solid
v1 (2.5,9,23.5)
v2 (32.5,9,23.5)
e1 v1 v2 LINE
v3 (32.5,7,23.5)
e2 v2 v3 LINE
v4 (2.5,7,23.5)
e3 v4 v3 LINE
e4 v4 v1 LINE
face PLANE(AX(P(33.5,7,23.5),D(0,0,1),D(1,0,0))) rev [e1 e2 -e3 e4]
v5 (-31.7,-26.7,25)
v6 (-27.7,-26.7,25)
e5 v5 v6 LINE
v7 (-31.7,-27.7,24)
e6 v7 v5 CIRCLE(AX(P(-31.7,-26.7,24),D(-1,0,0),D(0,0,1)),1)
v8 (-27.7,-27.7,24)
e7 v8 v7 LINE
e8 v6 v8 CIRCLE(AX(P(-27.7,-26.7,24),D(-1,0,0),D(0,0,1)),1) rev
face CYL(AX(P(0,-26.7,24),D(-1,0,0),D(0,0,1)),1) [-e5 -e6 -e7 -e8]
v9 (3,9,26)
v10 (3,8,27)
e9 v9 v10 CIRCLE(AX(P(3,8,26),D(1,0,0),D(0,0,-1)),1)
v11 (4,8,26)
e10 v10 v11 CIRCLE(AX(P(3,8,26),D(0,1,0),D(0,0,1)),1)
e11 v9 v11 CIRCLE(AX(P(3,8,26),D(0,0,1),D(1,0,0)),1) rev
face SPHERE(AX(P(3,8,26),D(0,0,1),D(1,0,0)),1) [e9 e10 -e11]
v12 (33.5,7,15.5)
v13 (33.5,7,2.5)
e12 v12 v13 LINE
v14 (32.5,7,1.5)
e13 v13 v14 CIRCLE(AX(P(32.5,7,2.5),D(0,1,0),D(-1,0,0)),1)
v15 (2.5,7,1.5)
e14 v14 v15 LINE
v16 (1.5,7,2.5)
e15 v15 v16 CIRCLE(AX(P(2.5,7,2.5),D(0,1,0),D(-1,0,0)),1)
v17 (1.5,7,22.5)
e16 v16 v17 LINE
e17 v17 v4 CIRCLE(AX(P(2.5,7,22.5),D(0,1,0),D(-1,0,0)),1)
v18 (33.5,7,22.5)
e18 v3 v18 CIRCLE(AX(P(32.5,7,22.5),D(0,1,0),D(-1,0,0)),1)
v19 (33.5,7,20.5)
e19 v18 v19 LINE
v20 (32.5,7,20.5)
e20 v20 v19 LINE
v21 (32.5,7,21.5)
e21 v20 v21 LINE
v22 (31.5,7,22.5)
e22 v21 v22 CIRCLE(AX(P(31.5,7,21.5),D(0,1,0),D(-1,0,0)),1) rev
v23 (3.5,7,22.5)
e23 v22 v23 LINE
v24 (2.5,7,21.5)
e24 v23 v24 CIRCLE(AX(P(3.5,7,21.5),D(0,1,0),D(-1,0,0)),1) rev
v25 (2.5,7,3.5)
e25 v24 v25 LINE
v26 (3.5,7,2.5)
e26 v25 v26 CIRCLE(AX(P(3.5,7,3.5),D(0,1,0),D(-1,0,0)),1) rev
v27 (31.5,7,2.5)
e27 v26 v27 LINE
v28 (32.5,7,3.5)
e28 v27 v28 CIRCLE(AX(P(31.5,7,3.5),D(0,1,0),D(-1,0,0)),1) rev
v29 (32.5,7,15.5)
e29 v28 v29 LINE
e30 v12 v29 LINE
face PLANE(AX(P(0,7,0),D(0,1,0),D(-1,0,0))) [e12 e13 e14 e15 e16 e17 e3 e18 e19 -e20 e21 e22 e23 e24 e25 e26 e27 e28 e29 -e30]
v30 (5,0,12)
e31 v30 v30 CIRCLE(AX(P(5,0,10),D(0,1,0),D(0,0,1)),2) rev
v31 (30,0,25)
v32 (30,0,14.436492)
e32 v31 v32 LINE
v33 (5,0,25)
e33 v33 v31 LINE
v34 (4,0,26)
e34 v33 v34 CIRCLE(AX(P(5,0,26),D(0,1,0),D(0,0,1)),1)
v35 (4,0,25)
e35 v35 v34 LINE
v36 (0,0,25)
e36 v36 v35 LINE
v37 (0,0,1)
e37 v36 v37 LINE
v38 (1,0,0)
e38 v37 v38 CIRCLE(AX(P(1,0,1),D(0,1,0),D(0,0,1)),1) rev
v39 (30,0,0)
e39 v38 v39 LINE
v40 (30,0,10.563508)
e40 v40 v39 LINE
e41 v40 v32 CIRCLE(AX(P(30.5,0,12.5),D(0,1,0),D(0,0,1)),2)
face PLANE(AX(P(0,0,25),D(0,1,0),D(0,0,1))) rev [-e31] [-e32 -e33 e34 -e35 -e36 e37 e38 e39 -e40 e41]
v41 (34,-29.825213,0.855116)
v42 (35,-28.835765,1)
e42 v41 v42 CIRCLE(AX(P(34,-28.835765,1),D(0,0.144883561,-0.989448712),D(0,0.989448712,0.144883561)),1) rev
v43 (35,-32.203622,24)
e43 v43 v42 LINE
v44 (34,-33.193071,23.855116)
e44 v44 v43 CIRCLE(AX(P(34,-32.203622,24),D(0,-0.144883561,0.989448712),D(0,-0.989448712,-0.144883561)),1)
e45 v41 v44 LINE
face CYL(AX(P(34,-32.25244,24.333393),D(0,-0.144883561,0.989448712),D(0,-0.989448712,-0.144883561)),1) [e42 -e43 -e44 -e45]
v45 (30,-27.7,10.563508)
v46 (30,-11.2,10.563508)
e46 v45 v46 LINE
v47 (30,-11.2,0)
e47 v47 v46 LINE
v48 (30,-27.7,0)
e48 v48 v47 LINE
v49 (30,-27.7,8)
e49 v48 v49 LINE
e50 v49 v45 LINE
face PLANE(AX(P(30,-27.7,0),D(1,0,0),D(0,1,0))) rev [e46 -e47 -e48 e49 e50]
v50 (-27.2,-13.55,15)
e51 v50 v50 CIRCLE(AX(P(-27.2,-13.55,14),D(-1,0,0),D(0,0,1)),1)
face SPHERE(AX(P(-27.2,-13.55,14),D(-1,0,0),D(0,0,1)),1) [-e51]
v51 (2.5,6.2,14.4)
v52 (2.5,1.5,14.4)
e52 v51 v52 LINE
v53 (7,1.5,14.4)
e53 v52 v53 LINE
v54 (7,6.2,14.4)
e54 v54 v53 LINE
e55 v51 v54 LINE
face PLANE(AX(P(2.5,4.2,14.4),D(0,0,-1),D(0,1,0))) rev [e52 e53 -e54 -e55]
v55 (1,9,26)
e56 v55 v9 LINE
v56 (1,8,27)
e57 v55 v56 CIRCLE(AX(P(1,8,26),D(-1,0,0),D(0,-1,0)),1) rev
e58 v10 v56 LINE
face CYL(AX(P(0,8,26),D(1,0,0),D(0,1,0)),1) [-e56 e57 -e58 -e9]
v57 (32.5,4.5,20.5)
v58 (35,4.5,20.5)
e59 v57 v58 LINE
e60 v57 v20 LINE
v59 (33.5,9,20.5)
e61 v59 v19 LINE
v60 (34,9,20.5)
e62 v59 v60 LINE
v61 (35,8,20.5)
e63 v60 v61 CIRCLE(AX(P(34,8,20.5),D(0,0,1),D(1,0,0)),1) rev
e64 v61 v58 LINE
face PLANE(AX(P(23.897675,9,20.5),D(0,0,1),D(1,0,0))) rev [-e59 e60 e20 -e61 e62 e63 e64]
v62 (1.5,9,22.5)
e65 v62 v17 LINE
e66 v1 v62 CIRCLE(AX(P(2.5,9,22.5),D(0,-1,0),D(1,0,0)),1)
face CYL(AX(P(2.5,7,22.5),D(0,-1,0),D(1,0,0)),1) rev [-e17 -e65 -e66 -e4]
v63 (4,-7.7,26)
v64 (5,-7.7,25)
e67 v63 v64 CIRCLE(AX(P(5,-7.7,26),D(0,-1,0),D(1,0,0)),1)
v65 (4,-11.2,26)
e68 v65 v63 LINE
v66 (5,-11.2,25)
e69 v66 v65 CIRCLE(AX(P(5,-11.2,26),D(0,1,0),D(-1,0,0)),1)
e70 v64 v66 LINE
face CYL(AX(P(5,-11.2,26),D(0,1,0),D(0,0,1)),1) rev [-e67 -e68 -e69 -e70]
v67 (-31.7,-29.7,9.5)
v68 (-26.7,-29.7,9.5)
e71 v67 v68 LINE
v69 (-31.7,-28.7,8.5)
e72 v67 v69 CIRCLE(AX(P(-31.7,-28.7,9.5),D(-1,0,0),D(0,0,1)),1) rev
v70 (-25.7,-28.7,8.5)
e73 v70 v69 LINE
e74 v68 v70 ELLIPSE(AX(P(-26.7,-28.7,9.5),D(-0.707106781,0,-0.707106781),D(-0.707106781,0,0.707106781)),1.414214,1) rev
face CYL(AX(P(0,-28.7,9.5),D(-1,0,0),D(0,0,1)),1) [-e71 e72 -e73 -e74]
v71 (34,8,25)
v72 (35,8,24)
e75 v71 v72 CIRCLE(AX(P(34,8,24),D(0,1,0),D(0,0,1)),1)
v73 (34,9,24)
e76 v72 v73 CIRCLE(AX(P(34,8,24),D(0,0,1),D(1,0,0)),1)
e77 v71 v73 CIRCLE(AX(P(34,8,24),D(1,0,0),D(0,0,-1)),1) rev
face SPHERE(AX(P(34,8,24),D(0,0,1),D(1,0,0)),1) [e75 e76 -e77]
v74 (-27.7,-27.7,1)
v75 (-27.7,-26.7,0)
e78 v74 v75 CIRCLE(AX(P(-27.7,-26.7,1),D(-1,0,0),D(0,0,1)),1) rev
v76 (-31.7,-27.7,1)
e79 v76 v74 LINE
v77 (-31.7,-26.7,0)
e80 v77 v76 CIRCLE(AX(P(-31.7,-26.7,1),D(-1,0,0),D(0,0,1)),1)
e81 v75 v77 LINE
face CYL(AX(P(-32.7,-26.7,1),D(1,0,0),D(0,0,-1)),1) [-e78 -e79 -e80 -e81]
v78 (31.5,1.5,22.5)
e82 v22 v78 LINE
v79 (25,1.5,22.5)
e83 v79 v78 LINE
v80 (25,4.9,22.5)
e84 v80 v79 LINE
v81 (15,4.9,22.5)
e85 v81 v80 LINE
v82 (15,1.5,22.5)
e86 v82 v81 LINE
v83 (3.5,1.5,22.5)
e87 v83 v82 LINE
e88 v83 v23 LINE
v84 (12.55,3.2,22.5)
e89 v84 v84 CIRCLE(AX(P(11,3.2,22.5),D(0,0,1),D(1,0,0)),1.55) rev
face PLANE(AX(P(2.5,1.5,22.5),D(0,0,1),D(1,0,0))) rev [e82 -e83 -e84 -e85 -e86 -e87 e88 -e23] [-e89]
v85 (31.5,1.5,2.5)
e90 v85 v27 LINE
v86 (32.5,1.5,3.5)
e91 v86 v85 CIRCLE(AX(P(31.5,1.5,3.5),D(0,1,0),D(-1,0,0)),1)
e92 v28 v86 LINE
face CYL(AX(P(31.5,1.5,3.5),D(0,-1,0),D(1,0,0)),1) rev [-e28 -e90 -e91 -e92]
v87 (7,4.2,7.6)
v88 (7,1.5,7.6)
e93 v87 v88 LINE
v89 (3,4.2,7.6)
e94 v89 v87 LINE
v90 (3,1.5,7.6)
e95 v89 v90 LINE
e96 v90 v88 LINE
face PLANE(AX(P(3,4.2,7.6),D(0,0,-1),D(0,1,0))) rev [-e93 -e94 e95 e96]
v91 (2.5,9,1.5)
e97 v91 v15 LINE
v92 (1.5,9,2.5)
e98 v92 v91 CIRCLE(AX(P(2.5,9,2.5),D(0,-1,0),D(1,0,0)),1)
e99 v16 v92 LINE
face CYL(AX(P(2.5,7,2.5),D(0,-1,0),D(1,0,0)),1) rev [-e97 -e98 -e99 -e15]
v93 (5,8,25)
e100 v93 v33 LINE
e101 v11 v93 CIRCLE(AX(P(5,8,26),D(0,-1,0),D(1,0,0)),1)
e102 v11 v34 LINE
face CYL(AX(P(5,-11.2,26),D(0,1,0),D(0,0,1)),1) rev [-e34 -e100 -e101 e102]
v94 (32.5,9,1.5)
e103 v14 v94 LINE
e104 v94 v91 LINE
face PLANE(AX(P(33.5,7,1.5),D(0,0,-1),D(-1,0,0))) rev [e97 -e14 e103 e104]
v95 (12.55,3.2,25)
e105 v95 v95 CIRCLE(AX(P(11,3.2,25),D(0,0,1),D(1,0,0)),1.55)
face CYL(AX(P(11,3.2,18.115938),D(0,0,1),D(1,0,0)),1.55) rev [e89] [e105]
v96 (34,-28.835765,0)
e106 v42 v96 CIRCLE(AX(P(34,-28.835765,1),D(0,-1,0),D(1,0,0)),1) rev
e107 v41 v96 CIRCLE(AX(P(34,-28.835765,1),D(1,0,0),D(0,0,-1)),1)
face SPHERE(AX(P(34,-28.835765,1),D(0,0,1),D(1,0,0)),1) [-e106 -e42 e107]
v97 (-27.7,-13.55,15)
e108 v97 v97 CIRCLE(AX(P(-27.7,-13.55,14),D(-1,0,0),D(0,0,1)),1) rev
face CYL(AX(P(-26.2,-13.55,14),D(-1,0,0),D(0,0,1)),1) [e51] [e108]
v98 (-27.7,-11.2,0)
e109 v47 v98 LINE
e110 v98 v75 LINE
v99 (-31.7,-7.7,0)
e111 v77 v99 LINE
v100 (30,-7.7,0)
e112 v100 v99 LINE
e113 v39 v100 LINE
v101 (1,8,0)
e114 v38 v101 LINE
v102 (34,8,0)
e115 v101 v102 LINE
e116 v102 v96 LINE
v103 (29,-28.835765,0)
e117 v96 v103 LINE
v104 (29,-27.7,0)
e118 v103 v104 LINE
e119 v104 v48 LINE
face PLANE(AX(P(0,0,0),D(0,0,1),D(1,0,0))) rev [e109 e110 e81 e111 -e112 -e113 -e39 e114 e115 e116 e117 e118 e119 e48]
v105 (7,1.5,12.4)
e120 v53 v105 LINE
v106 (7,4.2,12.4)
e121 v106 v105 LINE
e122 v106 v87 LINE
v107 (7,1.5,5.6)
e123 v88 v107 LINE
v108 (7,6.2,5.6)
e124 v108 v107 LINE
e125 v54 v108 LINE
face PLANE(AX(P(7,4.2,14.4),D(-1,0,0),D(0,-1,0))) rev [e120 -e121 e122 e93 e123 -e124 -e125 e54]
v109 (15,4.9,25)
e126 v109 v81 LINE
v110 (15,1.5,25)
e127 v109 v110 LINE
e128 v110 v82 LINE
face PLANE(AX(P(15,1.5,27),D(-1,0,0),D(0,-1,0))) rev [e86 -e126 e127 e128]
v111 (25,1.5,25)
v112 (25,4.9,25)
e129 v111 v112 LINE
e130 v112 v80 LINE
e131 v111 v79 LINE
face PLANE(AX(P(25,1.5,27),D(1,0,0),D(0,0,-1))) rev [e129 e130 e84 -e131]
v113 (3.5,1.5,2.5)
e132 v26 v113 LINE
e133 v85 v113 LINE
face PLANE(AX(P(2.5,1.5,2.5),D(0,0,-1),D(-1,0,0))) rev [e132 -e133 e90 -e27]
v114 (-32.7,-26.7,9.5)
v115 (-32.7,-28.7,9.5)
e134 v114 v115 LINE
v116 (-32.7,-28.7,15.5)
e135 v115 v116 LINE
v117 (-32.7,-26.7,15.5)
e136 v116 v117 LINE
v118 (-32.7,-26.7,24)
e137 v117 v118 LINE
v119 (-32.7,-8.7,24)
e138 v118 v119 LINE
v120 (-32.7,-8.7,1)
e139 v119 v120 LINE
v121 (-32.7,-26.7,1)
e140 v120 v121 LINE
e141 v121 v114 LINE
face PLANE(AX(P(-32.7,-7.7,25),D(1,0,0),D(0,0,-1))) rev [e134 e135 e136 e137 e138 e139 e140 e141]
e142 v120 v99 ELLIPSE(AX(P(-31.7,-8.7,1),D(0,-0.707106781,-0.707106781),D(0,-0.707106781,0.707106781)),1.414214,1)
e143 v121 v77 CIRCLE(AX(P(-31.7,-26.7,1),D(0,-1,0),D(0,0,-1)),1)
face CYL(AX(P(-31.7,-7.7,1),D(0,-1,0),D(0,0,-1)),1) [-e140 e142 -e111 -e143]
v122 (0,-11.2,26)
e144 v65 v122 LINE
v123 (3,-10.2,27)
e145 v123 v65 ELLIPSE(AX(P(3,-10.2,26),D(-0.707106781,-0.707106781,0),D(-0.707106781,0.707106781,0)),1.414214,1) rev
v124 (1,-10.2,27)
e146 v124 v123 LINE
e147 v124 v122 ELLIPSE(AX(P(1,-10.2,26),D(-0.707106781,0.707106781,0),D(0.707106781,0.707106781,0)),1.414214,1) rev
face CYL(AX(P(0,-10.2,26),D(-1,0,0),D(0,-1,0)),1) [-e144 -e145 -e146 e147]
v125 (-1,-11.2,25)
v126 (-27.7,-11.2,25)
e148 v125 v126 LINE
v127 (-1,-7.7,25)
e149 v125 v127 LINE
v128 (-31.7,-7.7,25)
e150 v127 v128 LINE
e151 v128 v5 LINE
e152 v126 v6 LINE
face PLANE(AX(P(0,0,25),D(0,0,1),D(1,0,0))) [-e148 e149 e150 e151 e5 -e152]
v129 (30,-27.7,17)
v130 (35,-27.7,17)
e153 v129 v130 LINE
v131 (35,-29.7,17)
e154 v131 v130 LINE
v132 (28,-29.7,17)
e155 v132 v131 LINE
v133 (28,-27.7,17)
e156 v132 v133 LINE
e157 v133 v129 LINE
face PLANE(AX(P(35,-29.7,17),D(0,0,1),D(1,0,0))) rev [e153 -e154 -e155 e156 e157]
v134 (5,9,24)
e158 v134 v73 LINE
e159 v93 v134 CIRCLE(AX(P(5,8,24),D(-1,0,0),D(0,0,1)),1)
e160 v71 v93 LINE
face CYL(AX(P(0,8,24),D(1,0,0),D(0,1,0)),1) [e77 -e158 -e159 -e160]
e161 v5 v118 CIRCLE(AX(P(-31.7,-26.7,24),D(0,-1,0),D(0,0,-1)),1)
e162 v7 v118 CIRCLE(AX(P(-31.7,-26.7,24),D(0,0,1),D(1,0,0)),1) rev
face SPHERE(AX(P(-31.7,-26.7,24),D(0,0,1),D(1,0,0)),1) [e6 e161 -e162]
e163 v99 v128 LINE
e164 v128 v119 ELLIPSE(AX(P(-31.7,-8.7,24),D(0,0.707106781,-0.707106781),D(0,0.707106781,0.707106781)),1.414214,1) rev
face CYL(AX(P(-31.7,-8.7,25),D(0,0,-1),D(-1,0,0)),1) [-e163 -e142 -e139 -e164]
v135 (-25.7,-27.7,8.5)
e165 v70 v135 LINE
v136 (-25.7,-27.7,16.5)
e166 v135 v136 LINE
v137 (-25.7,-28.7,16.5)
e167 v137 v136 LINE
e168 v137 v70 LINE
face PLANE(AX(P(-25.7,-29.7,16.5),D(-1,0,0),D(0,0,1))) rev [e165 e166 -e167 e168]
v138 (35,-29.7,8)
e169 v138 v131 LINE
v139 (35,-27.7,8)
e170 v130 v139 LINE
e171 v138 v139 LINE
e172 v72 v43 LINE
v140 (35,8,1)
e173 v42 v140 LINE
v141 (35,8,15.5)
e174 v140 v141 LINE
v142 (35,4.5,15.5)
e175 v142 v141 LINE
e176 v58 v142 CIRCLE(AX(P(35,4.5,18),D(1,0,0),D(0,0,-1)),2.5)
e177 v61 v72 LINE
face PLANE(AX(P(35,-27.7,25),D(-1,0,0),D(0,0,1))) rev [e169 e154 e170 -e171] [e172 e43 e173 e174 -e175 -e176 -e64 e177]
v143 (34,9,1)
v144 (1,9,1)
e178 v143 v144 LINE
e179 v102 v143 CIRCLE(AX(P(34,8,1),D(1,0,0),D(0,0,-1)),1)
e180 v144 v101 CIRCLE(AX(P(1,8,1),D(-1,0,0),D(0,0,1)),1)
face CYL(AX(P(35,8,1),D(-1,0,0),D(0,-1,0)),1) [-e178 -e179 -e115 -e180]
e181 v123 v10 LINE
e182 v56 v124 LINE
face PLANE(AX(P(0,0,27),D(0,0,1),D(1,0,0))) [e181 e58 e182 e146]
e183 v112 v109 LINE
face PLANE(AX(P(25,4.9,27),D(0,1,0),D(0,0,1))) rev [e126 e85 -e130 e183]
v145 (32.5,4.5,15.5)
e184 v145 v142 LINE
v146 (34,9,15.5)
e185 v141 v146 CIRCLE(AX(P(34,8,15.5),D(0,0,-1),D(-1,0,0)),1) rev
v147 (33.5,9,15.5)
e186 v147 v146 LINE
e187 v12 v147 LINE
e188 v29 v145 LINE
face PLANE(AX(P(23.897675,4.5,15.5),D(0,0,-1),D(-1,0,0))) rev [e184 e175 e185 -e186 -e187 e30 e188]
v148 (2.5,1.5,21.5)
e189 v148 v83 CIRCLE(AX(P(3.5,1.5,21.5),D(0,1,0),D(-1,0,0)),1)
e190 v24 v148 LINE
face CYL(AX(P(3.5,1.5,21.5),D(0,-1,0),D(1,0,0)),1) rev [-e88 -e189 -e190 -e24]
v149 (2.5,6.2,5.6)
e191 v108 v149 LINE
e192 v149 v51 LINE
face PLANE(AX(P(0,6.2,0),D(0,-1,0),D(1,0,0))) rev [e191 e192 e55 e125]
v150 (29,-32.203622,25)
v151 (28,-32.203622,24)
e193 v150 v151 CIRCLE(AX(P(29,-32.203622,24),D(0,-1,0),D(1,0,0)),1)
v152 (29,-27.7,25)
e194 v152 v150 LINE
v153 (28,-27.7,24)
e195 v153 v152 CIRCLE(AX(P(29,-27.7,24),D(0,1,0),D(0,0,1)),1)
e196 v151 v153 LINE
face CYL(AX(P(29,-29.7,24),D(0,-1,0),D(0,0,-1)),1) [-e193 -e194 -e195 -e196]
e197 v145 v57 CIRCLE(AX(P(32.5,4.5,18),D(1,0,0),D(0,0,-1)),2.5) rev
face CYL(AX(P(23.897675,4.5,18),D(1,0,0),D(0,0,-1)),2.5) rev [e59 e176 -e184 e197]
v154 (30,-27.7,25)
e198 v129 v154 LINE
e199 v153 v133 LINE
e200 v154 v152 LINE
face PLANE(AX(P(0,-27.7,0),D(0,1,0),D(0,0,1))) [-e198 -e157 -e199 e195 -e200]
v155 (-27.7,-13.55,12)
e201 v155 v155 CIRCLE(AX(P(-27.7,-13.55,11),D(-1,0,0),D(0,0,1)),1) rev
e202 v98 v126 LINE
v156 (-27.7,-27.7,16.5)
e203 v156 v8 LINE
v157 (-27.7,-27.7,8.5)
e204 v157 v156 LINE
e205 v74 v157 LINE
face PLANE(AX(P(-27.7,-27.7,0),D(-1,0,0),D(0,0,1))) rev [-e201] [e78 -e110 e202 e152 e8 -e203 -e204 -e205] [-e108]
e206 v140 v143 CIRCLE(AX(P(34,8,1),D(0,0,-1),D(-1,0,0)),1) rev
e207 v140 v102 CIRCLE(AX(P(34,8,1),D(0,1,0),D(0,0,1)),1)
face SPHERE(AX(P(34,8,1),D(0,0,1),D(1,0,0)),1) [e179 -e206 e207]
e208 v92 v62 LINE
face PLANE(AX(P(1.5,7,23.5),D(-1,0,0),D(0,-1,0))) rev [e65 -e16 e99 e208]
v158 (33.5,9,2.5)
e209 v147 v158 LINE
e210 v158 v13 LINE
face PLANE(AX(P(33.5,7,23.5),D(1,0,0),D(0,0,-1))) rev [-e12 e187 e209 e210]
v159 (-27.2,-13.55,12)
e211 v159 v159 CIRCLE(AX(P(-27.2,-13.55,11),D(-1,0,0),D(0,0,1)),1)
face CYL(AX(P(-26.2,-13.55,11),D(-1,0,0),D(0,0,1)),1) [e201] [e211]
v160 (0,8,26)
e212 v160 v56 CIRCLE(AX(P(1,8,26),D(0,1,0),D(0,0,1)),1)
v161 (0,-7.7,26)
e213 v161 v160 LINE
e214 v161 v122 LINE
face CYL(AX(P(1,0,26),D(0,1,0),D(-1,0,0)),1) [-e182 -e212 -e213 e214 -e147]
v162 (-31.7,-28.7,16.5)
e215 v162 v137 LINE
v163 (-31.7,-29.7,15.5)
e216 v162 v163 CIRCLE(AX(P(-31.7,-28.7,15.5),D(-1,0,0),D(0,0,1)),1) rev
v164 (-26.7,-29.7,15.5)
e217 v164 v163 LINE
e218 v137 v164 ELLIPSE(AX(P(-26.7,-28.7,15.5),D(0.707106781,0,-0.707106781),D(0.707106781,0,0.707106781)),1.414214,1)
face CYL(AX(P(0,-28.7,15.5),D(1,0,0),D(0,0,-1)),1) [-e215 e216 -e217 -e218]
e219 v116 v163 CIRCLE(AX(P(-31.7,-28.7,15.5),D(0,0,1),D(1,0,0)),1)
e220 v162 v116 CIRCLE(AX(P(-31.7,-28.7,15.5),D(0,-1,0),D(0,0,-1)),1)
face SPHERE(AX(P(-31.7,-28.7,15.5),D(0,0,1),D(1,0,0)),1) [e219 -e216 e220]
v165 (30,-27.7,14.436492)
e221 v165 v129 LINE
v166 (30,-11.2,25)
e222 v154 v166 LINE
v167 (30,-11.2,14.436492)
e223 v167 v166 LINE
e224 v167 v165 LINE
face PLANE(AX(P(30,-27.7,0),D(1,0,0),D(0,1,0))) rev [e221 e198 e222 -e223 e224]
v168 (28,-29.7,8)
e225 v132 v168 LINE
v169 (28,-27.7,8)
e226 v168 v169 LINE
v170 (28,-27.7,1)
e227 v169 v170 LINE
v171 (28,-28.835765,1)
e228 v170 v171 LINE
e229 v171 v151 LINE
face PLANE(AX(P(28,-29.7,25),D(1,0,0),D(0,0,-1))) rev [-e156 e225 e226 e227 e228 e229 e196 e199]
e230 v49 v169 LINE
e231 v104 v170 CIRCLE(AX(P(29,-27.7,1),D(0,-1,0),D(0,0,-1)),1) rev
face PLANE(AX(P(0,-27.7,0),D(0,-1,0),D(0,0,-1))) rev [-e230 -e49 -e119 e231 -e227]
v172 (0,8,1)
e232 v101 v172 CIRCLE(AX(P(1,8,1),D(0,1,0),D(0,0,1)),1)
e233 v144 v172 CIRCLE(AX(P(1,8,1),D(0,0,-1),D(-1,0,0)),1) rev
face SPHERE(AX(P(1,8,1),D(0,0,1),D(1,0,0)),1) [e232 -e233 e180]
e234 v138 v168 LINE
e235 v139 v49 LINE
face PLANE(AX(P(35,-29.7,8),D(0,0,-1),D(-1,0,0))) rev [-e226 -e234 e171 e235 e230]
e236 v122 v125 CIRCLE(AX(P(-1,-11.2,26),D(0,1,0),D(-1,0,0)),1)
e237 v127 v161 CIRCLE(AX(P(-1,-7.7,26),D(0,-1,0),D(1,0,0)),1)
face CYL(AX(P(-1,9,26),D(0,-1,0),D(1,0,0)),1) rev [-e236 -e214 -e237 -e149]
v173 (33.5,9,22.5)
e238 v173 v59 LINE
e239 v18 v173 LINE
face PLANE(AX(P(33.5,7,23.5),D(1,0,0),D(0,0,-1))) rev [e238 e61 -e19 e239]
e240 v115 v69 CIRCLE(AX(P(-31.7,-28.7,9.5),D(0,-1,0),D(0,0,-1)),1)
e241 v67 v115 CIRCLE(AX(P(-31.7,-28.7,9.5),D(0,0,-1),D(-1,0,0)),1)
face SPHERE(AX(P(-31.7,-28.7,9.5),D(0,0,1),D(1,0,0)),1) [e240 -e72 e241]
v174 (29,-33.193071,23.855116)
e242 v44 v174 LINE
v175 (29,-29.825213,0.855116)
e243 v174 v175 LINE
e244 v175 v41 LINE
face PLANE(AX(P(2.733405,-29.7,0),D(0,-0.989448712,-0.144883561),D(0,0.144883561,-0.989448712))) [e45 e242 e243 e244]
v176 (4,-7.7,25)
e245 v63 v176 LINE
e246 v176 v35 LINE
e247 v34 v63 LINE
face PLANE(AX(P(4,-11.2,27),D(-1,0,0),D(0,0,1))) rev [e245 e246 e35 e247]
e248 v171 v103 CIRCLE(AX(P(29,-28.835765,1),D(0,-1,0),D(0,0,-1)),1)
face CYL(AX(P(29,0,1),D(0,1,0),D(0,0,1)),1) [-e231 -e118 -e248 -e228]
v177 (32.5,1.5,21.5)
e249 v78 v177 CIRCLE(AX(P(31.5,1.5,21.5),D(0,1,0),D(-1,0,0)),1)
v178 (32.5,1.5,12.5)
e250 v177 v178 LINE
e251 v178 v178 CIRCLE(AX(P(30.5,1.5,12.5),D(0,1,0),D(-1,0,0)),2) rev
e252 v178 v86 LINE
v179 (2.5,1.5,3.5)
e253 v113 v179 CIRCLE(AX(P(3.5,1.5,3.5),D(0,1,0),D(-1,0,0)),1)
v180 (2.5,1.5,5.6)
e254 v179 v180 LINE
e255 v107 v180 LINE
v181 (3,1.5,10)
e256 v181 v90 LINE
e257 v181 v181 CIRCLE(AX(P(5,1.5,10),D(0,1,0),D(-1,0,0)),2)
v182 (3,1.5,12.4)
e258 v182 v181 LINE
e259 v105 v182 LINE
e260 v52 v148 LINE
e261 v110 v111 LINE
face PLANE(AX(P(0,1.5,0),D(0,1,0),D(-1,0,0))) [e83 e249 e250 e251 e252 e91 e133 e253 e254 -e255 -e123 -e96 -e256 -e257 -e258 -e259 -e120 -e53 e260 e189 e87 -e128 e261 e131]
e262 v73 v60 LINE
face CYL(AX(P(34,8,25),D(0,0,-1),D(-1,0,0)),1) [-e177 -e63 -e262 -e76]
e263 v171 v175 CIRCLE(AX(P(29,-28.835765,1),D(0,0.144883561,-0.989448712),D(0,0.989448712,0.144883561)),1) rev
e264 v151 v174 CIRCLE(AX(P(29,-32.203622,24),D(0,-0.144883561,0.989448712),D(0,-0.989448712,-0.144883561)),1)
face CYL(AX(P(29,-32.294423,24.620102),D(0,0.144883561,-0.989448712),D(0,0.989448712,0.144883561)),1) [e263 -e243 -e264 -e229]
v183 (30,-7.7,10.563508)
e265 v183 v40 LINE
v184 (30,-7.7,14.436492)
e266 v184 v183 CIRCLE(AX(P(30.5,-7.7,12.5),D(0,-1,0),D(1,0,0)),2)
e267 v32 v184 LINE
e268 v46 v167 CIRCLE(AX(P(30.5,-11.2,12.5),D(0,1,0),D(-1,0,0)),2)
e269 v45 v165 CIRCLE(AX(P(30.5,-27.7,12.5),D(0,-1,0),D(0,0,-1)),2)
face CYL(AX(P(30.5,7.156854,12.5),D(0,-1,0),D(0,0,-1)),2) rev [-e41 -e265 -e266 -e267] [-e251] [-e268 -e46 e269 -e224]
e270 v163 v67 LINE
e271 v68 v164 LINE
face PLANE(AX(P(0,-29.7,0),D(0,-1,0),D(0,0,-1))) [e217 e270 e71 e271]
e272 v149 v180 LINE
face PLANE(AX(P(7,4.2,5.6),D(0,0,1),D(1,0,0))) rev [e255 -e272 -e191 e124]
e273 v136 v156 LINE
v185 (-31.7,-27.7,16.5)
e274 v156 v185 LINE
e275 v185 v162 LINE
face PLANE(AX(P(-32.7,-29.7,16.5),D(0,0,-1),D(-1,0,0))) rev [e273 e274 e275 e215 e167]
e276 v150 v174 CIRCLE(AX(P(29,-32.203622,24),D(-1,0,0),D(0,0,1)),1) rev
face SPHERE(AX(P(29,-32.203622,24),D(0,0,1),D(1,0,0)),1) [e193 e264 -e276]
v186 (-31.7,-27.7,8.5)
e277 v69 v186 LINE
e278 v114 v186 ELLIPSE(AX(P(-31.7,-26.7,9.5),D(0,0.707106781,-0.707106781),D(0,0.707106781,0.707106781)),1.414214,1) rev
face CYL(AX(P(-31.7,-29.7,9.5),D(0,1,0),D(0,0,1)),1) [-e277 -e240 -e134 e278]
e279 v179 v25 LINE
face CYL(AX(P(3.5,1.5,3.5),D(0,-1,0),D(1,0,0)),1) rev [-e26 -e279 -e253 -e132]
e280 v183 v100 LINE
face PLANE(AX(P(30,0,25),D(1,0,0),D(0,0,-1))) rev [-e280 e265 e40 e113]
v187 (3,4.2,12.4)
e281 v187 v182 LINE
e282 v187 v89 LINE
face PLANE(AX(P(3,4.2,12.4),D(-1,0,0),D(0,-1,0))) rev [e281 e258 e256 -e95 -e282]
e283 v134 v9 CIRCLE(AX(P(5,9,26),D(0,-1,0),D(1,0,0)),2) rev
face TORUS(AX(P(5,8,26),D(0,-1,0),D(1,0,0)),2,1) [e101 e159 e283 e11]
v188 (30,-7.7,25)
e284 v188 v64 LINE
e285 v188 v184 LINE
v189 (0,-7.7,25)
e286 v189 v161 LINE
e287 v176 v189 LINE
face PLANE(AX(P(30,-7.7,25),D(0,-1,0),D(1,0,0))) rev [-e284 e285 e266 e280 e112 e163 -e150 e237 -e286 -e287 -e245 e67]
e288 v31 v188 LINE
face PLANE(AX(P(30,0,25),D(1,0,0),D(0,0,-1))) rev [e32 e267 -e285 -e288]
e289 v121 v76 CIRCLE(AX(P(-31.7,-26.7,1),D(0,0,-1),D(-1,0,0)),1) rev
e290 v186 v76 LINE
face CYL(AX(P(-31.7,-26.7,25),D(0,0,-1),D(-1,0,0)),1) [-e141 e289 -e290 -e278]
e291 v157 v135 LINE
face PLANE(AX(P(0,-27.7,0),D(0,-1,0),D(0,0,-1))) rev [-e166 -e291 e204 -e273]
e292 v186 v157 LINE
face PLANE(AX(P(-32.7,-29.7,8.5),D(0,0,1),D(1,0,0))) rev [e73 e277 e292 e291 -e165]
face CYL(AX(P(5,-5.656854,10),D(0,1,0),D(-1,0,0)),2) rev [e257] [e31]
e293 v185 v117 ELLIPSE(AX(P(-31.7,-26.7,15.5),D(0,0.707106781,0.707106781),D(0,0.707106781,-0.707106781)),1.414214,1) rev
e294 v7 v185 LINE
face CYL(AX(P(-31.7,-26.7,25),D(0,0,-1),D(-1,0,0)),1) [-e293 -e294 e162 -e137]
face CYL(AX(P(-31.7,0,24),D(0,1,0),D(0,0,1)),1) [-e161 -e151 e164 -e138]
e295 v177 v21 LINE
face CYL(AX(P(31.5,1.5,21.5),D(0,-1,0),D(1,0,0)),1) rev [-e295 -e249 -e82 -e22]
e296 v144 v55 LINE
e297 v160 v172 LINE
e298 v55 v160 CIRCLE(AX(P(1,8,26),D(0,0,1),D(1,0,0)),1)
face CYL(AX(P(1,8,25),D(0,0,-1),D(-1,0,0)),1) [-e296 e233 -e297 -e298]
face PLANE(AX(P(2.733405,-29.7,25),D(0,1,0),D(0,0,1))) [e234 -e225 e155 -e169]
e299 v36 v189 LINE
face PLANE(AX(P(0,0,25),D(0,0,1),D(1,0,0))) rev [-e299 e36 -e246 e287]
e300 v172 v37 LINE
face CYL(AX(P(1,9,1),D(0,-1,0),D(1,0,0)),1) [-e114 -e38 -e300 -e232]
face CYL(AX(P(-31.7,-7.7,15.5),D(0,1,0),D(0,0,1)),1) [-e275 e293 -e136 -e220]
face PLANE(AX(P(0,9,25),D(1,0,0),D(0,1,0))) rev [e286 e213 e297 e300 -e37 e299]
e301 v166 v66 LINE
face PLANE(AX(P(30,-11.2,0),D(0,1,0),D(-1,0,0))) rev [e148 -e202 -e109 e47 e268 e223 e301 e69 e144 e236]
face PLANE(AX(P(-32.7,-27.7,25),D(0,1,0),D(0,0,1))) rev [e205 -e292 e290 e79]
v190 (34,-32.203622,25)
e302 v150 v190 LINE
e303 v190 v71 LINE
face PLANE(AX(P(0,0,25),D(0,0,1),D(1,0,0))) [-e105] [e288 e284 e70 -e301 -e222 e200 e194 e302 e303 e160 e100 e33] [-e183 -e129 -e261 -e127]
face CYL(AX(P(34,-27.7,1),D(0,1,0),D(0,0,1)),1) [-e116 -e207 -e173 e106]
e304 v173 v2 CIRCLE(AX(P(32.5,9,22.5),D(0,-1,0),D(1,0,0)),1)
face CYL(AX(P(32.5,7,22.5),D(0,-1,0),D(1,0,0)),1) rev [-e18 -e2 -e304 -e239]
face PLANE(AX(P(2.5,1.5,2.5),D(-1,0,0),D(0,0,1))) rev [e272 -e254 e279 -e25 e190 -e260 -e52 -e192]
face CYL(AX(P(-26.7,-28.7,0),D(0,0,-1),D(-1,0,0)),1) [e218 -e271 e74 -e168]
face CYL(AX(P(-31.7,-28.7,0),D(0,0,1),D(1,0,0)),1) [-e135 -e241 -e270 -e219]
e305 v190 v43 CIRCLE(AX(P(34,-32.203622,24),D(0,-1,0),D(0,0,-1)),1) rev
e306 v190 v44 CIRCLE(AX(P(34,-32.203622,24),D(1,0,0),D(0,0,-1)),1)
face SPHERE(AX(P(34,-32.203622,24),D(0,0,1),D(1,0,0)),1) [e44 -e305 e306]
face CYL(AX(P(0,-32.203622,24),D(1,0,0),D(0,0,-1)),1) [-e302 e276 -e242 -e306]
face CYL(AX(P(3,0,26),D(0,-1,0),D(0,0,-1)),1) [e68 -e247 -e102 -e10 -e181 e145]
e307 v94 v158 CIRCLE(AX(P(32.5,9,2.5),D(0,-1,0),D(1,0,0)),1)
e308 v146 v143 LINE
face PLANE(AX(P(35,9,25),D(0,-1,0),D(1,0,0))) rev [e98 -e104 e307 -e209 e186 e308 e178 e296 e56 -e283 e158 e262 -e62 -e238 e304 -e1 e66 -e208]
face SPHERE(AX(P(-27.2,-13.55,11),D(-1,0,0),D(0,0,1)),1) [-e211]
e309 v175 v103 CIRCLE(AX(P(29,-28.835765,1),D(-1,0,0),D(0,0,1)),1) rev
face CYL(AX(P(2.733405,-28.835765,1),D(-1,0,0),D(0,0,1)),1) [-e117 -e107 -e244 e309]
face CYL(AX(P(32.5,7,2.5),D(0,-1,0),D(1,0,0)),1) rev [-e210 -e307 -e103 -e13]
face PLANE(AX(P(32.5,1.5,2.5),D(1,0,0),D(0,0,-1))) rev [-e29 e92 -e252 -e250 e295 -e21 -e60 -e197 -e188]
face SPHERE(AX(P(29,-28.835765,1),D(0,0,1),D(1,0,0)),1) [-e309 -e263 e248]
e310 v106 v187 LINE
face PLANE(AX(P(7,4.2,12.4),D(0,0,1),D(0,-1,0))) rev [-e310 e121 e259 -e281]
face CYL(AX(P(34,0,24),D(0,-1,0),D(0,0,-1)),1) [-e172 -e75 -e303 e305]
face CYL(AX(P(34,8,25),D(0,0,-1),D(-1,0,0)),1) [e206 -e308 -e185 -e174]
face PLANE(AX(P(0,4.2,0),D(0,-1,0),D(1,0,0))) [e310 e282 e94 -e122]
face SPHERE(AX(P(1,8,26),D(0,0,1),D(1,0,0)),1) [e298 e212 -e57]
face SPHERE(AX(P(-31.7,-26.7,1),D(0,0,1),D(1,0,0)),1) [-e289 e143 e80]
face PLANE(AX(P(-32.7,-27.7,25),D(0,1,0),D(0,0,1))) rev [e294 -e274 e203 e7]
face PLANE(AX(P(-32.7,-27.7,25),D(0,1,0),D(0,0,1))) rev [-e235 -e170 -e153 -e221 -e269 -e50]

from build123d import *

# Parameters (mm, degrees)
BOSS_EXTRUDE1_DEPTH = 25
SKETCH2_W           = 57.7
SKETCH2_H           = 16.5
CUT_EXTRUDE1_DEPTH  = 52.159456604
SKETCH3_W           = 30
SKETCH3_H           = 20
CUT_EXTRUDE2_DEPTH  = 7.5
CUT_EXTRUDE3_REACH  = 58.541
SKETCH4_R           = 2
SKETCH5_R           = 2
CUT_EXTRUDE4_DEPTH  = 1.5
SKETCH6_W           = 7
SKETCH6_H           = 8
BOSS_EXTRUDE2_DEPTH = 2
SKETCH7_W           = 4
SKETCH7_H           = 20.2
BOSS_EXTRUDE3_DEPTH = 2
BOSS_EXTRUDE4_DEPTH = 7
SKETCH9_W           = 32
SKETCH9_H           = 22
CUT_EXTRUDE5_DEPTH  = 2
FILLET1_R           = 1
FILLET2_R           = 1
SKETCH10_R          = 1
BOSS_EXTRUDE5_DEPTH = 1.5
FILLET3_R           = 1
BOSS_EXTRUDE6_DEPTH = 2.7
CUT_EXTRUDE6_REACH  = 82.092
SKETCH13_W          = 4.5
SKETCH13_H          = 8.8
BOSS_EXTRUDE7_DEPTH = 2
SKETCH14_W          = 10
SKETCH14_H          = 3.4
CUT_EXTRUDE7_DEPTH  = 54.232805215
SKETCH15_R          = 1.55
CUT_EXTRUDE8_DEPTH  = 2.5


with BuildPart() as part:
    # Sketch1 → Boss-Extrude1 (new body)
    with BuildSketch(Plane.XY):
        Polygon((0, 0), (30, 0), (30, -7.7), (-32.7, -7.7), (-32.7, -27.7), (35, -27.7), (35, 9), (0, 9), align=None)
    extrude(amount=BOSS_EXTRUDE1_DEPTH)

    # Sketch2 → Cut-Extrude1 (cut, through all)
    with BuildSketch(Plane.XY.offset(25)):
        with Locations((1.15, -19.45)):
            Rectangle(SKETCH2_W, SKETCH2_H)
    extrude(amount=-CUT_EXTRUDE1_DEPTH, mode=Mode.SUBTRACT)

    # Sketch3 → Cut-Extrude2 (cut)
    with BuildSketch(Plane(origin=(0, 9, 0), x_dir=(1, 0, 0), z_dir=(0, 1, 0))):
        with Locations((17.5, -12.5)):
            Rectangle(SKETCH3_W, SKETCH3_H)
    extrude(amount=-CUT_EXTRUDE2_DEPTH, mode=Mode.SUBTRACT)

    # Cut-Extrude3: up to this face of the body (flat: up to its plane)
    cut_extrude3_end = Plane(part.part.faces().sort_by_distance((17.5, 1.5, 12.5))[0])
    # Sketch4 → Cut-Extrude3 (cut, up to the picked face)
    with BuildSketch(Plane.XZ.offset(27.7), mode=Mode.PRIVATE) as cut_extrude3_sk1:
        with Locations(Location((30.5, 12.5, 0), (0, 0, 255.522487814))):
            Circle(SKETCH4_R)
    cut_extrude3_tool1 = split(extrude(cut_extrude3_sk1.sketch, amount=-CUT_EXTRUDE3_REACH, mode=Mode.PRIVATE), bisect_by=cut_extrude3_end, keep=Keep.BOTH, mode=Mode.PRIVATE)
    add(cut_extrude3_tool1.solids().sort_by(Axis((30.5, -27.7, 12.5), (0, 1, 0)))[0], mode=Mode.SUBTRACT)

    # Sketch5 → Cut-Extrude4 (cut)
    with BuildSketch(Plane(origin=(0, 1.5, 0), x_dir=(1, 0, 0), z_dir=(0, 1, 0))):
        with Locations(Location((5, -10, 0), (0, 0, 180))):
            Circle(SKETCH5_R)
    extrude(amount=-CUT_EXTRUDE4_DEPTH, mode=Mode.SUBTRACT)

    # Sketch6 → Boss-Extrude2 (add)
    with BuildSketch(Plane.XZ.offset(27.7)):
        with Locations((31.5, 21)):
            Rectangle(SKETCH6_W, SKETCH6_H)
        with Locations((31.5, 4)):
            Rectangle(SKETCH6_W, SKETCH6_H)
        with Locations((-29.2, 12.5)):
            Rectangle(SKETCH6_W, SKETCH6_H)
    extrude(amount=BOSS_EXTRUDE2_DEPTH)

    # Sketch7 → Boss-Extrude3 (add)
    with BuildSketch(Plane.XY.offset(25)):
        with Locations((2, -1.1)):
            Rectangle(SKETCH7_W, SKETCH7_H)
    extrude(amount=BOSS_EXTRUDE3_DEPTH)

    # Sketch8 → Boss-Extrude4 (add)
    with BuildSketch(Plane(origin=(35, 0, 0), x_dir=(0, 0, -1), z_dir=(1, 0, 0))):
        Polygon((0, -29.7), (-25, -33.360714286), (-25, -29.7), align=None)
    extrude(amount=-BOSS_EXTRUDE4_DEPTH)

    # Sketch9 → Cut-Extrude5 (cut)
    with BuildSketch(Plane(origin=(0, 9, 0), x_dir=(1, 0, 0), z_dir=(0, 1, 0))):
        with Locations((17.5, -12.5)):
            Rectangle(SKETCH9_W, SKETCH9_H)
    extrude(amount=-CUT_EXTRUDE5_DEPTH, mode=Mode.SUBTRACT)

    # Fillet1
    fillet1_edges = [part.edges().sort_by_distance(p)[0] for p in [
        (33.5, 8, 1.5),
        (33.5, 8, 23.5),
        (1.5, 8, 23.5),
        (1.5, 8, 1.5),
        (2.5, 4.25, 22.5),
        (2.5, 4.25, 2.5),
        (32.5, 4.25, 2.5),
        (32.5, 4.25, 22.5),
    ]]
    fillet(fillet1_edges, radius=FILLET1_R)

    # Fillet2
    fillet2_edges = [part.edges().sort_by_distance(p)[0] for p in [
        (4, -9.45, 25),
        (4, 4.5, 25),
        (0, -9.45, 25),
    ]]
    fillet(fillet2_edges, radius=FILLET2_R)
    fillet2_2_edges = [part.edges().sort_by_distance(p)[0] for p in [
        (20, 9, 25),
        (0, 9, 13.5),
        (17.5, 9, 0),
        (35, 9, 12.5),
        (28, -30.530357143, 25),
        (28, -28.7, 0),
        (28, -31.530357143, 12.5),
        (35, -31.530357143, 12.5),
        (-30.2, -27.7, 0),
        (-30.2, -27.7, 25),
        (-29.2, -29.7, 8.5),
        (-29.2, -29.7, 16.5),
        (-32.7, -28.7, 8.5),
        (-32.7, -28.7, 16.5),
        (-32.7, -27.7, 20.75),
        (-32.7, -29.7, 12.5),
        (-32.7, -27.7, 4.25),
        (-32.7, -7.7, 12.5),
        (-32.7, -17.7, 0),
        (-32.7, -17.7, 25),
        (35, -10.35, 0),
        (35, -12.180357143, 25),
        (0, -1.1, 27),
        (0, 4.5, 0),
        (4, -1.1, 27),
        (2, -11.2, 27),
        (2, 9, 27),
        (31.5, -33.360714286, 25),
        (31.5, -29.7, 0),
        (-25.7, -29.7, 12.5),
        (4.292893219, 9, 25.292893219),
    ]]
    fillet(fillet2_2_edges, radius=FILLET2_R - 0.0001)  # a hair under: the kernel refuses the full size

    # Sketch10 → Boss-Extrude5 (add)
    with BuildSketch(Plane(origin=(-27.7, 0, 0), x_dir=(0, 0, -1), z_dir=(1, 0, 0))):
        with Locations(Location((-14, -13.55, 0), (0, 0, 180))):
            Circle(SKETCH10_R)
        with Locations(Location((-11, -13.55, 0), (0, 0, 180))):
            Circle(SKETCH10_R)
    extrude(amount=BOSS_EXTRUDE5_DEPTH)

    # Fillet3
    fillet3_edges = [part.edges().sort_by_distance(p)[0] for p in [
        (-26.2, -13.55, 13),
        (-26.2, -13.55, 10),
    ]]
    fillet(fillet3_edges, radius=FILLET3_R)

    # Sketch11 → Boss-Extrude6 (add)
    with BuildSketch(Plane(origin=(0, 1.5, 0), x_dir=(1, 0, 0), z_dir=(0, 1, 0))):
        Polygon((2.5, -5.6), (2.5, -14.4), (7, -14.4), (7, -12.4), (3, -12.4), (3, -7.6), (7, -7.6), (7, -5.6), align=None)
    extrude(amount=BOSS_EXTRUDE6_DEPTH)

    # Cut-Extrude6: up to this face of the body (flat: up to its plane)
    cut_extrude6_end = Plane(part.part.faces().sort_by_distance((32.5, 4.25, 12.5))[0])
    # Sketch12 → Cut-Extrude6 (cut, up to the picked face)
    with BuildSketch(Plane(origin=(35, 0, 0), x_dir=(0, 0, -1), z_dir=(1, 0, 0)), mode=Mode.PRIVATE) as cut_extrude6_sk1:
        with BuildLine():
            Line((-20.5, 9), (-20.5, 4.5))
            ThreePointArc((-20.5, 4.5), (-18, 2), (-15.5, 4.5))
            Line((-15.5, 4.5), (-15.5, 9))
            Line((-15.5, 9), (-20.5, 9))
        make_face()
    cut_extrude6_tool1 = split(extrude(cut_extrude6_sk1.sketch, amount=-CUT_EXTRUDE6_REACH, mode=Mode.PRIVATE), bisect_by=cut_extrude6_end, keep=Keep.BOTH, mode=Mode.PRIVATE)
    add(cut_extrude6_tool1.solids().sort_by(Axis((35, 5.744167, 18), (-1, 0, 0)))[0], mode=Mode.SUBTRACT)

    # Sketch13 → Boss-Extrude7 (add)
    with BuildSketch(Plane(origin=(0, 4.2, 0), x_dir=(1, 0, 0), z_dir=(0, 1, 0))):
        with Locations((4.75, -10)):
            Rectangle(SKETCH13_W, SKETCH13_H)
    extrude(amount=BOSS_EXTRUDE7_DEPTH)

    # Sketch14 → Cut-Extrude7 (cut, through all)
    with BuildSketch(Plane(origin=(0, 0, 22.5), x_dir=(-1, 0, 0), z_dir=(0, 0, -1))):
        with Locations((-20, 3.2)):
            Rectangle(SKETCH14_W, SKETCH14_H)
    extrude(amount=-CUT_EXTRUDE7_DEPTH, mode=Mode.SUBTRACT)

    # Sketch15 → Cut-Extrude8 (cut)
    with BuildSketch(Plane.XY.offset(25)):
        with Locations((11, 3.2)):
            Circle(SKETCH15_R)
    extrude(amount=-CUT_EXTRUDE8_DEPTH, mode=Mode.SUBTRACT)


solid = part.part
